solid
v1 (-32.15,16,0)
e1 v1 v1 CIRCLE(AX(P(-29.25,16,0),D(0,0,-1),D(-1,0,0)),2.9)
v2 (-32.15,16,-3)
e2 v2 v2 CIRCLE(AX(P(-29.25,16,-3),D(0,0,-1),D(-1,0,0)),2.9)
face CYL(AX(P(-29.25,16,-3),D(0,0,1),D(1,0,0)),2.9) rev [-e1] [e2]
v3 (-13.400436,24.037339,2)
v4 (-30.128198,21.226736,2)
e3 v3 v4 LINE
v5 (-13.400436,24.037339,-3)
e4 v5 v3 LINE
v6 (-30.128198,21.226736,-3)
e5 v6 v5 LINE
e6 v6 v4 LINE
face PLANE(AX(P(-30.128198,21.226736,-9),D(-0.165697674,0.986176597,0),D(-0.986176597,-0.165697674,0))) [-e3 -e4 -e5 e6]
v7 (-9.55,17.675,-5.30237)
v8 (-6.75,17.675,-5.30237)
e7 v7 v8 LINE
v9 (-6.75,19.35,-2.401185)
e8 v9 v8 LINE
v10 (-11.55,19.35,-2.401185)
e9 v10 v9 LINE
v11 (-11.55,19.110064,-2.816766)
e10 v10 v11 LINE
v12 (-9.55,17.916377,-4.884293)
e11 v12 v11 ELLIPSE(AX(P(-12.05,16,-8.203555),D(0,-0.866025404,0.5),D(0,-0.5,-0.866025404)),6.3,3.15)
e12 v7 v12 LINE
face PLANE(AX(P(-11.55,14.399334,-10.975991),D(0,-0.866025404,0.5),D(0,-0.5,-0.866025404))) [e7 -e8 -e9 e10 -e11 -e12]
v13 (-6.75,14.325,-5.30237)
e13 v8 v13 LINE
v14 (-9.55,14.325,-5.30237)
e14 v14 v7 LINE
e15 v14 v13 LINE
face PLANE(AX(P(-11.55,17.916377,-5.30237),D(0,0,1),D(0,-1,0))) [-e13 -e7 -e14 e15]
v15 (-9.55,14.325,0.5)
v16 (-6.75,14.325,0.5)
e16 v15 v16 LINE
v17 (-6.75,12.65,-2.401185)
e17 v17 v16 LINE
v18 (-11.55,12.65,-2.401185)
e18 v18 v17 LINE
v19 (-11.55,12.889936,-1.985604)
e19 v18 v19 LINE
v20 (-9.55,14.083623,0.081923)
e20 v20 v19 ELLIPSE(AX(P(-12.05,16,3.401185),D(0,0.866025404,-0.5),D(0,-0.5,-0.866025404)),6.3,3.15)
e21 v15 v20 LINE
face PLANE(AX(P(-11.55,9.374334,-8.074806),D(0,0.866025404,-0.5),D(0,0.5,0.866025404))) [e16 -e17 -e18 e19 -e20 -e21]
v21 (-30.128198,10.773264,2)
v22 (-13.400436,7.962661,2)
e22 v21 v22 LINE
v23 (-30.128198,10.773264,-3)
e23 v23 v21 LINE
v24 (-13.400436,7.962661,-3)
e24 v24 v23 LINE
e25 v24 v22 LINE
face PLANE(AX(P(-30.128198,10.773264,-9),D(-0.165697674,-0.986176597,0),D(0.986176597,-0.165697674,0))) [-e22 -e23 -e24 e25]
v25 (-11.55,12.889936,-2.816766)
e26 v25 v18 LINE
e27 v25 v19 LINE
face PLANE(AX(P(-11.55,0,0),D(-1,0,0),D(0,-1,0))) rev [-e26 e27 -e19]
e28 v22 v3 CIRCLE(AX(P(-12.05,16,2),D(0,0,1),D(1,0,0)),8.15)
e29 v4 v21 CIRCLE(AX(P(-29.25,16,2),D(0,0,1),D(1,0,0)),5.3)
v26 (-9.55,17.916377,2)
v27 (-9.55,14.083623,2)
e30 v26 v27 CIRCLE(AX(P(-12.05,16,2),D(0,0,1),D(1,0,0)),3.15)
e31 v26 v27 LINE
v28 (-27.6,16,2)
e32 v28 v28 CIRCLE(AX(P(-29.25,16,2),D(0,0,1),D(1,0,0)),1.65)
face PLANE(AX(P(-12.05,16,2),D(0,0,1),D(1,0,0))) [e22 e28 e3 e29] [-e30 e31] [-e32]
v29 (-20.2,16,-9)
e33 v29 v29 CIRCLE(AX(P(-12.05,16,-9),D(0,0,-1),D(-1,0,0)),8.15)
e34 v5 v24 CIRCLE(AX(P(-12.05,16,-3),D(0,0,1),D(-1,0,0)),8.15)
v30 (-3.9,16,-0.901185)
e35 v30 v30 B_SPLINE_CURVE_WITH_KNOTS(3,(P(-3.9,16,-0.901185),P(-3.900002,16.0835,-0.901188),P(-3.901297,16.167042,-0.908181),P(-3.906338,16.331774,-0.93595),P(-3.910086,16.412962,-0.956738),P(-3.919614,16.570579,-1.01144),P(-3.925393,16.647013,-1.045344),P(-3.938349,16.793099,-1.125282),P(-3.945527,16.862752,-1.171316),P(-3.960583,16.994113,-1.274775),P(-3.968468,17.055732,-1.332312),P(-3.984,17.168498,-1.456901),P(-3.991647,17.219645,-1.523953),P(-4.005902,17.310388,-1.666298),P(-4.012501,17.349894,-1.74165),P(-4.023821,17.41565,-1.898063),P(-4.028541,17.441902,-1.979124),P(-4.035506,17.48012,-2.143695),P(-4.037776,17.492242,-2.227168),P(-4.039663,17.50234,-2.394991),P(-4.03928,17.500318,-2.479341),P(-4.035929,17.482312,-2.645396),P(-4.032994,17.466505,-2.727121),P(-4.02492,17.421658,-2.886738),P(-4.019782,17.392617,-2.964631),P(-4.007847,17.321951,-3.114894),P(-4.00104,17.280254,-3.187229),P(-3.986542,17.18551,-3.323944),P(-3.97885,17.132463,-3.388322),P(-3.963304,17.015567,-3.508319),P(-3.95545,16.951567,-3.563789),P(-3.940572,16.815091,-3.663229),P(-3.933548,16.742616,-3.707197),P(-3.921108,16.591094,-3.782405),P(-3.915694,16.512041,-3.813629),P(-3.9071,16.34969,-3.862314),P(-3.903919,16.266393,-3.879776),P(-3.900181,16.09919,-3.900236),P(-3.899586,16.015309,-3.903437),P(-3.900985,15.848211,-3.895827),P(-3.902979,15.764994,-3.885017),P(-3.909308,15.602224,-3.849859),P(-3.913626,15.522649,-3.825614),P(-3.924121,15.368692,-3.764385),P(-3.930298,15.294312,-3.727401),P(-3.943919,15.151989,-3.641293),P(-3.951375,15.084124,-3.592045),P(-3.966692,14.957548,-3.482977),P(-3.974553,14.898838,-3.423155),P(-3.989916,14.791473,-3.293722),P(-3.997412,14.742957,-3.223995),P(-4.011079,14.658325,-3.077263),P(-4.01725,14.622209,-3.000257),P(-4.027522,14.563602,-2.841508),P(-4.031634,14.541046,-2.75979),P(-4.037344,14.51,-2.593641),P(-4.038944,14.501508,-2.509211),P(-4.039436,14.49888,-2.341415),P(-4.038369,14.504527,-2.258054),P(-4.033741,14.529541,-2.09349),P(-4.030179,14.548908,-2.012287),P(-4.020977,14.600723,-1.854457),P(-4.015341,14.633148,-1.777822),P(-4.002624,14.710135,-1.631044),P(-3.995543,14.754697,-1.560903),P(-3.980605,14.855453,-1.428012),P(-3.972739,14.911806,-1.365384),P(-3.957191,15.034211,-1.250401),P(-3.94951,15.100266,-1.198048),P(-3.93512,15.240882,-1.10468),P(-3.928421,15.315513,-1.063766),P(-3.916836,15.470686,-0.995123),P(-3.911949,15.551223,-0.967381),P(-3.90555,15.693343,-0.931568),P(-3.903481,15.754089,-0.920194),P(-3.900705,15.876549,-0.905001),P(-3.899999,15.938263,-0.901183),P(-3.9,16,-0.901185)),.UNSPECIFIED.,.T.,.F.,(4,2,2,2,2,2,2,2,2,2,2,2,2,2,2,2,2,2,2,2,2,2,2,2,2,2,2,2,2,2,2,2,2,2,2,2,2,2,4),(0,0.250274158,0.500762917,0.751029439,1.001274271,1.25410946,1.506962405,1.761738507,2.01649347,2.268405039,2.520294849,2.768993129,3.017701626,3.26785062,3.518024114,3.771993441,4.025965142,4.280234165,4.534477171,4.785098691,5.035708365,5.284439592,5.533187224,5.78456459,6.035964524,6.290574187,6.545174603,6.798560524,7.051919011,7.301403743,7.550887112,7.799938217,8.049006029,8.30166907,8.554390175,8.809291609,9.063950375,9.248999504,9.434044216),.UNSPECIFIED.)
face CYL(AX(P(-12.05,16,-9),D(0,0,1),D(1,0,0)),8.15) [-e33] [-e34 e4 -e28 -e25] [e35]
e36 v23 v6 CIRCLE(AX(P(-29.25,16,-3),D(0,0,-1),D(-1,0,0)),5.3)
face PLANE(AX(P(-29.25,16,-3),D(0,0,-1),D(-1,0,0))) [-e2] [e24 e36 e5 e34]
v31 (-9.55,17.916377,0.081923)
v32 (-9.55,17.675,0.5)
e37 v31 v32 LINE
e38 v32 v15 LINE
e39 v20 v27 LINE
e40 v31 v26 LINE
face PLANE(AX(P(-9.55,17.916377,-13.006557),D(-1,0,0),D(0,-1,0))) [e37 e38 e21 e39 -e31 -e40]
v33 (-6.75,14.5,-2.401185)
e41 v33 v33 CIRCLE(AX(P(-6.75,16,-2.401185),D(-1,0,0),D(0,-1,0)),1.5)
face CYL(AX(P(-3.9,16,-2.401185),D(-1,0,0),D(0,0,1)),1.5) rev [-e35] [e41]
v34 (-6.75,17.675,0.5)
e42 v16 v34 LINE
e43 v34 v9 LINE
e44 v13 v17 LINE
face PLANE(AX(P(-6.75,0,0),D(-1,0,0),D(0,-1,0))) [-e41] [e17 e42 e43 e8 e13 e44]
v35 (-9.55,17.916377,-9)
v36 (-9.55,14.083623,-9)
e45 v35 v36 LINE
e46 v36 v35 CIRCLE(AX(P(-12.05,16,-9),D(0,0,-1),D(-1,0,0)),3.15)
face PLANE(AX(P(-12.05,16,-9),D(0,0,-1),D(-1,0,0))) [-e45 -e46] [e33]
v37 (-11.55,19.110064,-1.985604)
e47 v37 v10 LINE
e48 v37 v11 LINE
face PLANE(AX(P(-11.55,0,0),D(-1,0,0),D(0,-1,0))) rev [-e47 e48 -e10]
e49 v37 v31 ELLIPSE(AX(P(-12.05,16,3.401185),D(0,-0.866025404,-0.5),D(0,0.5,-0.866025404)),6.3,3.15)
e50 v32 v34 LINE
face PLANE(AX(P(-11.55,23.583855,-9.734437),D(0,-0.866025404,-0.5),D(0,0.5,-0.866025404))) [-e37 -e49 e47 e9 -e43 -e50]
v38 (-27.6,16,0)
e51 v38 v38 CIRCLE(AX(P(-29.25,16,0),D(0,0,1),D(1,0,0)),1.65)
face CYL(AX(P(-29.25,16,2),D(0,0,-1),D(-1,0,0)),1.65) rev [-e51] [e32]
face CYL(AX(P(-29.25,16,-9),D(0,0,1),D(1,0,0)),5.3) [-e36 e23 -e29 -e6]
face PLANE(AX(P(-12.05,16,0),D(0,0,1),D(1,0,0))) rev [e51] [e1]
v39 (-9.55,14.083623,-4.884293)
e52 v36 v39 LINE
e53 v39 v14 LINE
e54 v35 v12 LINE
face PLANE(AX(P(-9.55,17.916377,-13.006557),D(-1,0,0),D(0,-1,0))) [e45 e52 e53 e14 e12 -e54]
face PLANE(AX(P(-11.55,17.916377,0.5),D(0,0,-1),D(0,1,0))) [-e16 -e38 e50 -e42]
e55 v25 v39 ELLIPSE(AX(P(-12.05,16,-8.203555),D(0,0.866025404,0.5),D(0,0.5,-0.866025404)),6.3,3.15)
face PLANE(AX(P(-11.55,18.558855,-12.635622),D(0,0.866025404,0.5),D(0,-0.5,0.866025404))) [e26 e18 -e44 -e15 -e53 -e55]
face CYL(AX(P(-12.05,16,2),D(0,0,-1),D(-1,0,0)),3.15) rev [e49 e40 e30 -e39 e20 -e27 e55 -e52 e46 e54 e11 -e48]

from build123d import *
from build123d.topology import SkipClean

# Parameters (mm, degrees)
SKETCH1_R               = 22.5
SKETCH1_R_2             = 3.15
SKETCH1_R_3             = 1.65
BOSS_EXTRUDE1_DEPTH     = 2
BOSS_EXTRUDE2_START     = 9
SKETCH2_R               = 8.15
SKETCH2_R_2             = 3.15
BOSS_EXTRUDE2_DEPTH     = 9
CUT_EXTRUDE1_DEPTH      = 53.886222213
CUT_EXTRUDE1_DEPTH_BACK = 53.886222213
SKETCH3_W               = 59.321790447
SKETCH3_H               = 68.701430229
BOSS_EXTRUDE4_START     = -11
BOSS_EXTRUDE4_DEPTH     = 11
CUT_EXTRUDE2_DEPTH      = 2.8
CUT_EXTRUDE2_DEPTH_BACK = 2
CUT_EXTRUDE2_START      = -9.55
SKETCH5_R               = 1.5
CUT_EXTRUDE3_DEPTH      = 35.543052847
BOSS_EXTRUDE3_START     = 3
SKETCH6_R               = 2.9
BOSS_EXTRUDE3_DEPTH     = 3


# Read off the part's stored shape, not the designer's step: Boss-Extrude4
with BuildPart() as part:
    # Sketch1 → Boss-Extrude1 (new body)
    with BuildSketch(Plane.XY):
        with Locations((-12.05, 16)):
            Circle(SKETCH1_R)
        with Locations((-12.05, 16)):
            Circle(SKETCH1_R_2, mode=Mode.SUBTRACT)
        with Locations((-29.25, 16)):
            Circle(SKETCH1_R_3, mode=Mode.SUBTRACT)
        with Locations((5.15, 16)):
            Circle(SKETCH1_R_3, mode=Mode.SUBTRACT)
    extrude(amount=BOSS_EXTRUDE1_DEPTH)

    # Sketch2 → Boss-Extrude2 (add)
    with SkipClean():  # the faces are left unmerged after this step: merging them gives an invalid solid
        with BuildSketch(Plane(origin=(0, 0, 0), x_dir=(-1, 0, 0), z_dir=(0, 0, -1)).offset(BOSS_EXTRUDE2_START)):
            with Locations(Location((12.05, 16, 0), (0, 0, 180))):
                Circle(SKETCH2_R)
            with Locations((12.05, 16)):
                Circle(SKETCH2_R_2, mode=Mode.SUBTRACT)
        extrude(amount=-BOSS_EXTRUDE2_DEPTH)

    # Sketch3 → Cut-Extrude1 (cut, two sides: drawn at the far end of the back side and taken through both)
    with BuildSketch(Plane.XY.offset(2).offset(-CUT_EXTRUDE1_DEPTH_BACK)):
        with Locations((-10.056838751, 16.22852839)):
            Rectangle(SKETCH3_W, SKETCH3_H)
        with BuildLine():
            Line((-30.128197674, 10.773264035), (-13.400436047, 7.962660734))
            ThreePointArc((-13.400436047, 7.962660734), (-3.9, 16), (-13.400436047, 24.037339266))
            Line((-13.400436047, 24.037339266), (-30.128197674, 21.226735965))
            ThreePointArc((-30.128197674, 21.226735965), (-34.55, 16), (-30.128197674, 10.773264035))
        make_face(mode=Mode.SUBTRACT)
    extrude(amount=CUT_EXTRUDE1_DEPTH + CUT_EXTRUDE1_DEPTH_BACK, mode=Mode.SUBTRACT)

    # Boss-Extrude4 outline → Boss-Extrude4 (add)
    with BuildSketch(Plane.XY.offset(2).offset(BOSS_EXTRUDE4_START)):
        with BuildLine():
            ThreePointArc((-9.55, 14.08362321), (-8.9, 16), (-9.55, 17.91637679))
            Line((-9.55, 17.91637679), (-9.55, 14.08362321))
        make_face()
    extrude(amount=BOSS_EXTRUDE4_DEPTH)

    # Sketch4 → Cut-Extrude2 (cut, two sides: drawn at the far end of the back side and taken through both)
    with BuildSketch(Plane(origin=(0, 0, 0), x_dir=(0, 0, -1), z_dir=(1, 0, 0)).offset(CUT_EXTRUDE2_START - CUT_EXTRUDE2_DEPTH_BACK)):
        Polygon((-0.5, 17.675), (-0.5, 14.325), (2.401185103, 12.65), (5.302370205, 14.325), (5.302370205, 17.675), (2.401185103, 19.35), align=None)
    extrude(amount=CUT_EXTRUDE2_DEPTH + CUT_EXTRUDE2_DEPTH_BACK, mode=Mode.SUBTRACT)

    # Sketch5 → Cut-Extrude3 (cut, through all)
    with BuildSketch(Plane.ZY.offset(11.55)):
        with Locations((-2.401185103, 16)):
            Circle(SKETCH5_R)
    extrude(amount=-CUT_EXTRUDE3_DEPTH, mode=Mode.SUBTRACT)

    # Sketch6 → Boss-Extrude3 (add)
    with BuildSketch(Plane(origin=(0, 0, 0), x_dir=(-1, 0, 0), z_dir=(0, 0, -1)).offset(BOSS_EXTRUDE3_START)):
        with BuildLine():
            Line((30.128197674, 21.226735965), (13.400436047, 24.037339266))
            ThreePointArc((13.400436047, 24.037339266), (20.2, 16), (13.400436047, 7.962660734))
            Line((13.400436047, 7.962660734), (30.128197674, 10.773264035))
            ThreePointArc((30.128197674, 10.773264035), (34.55, 16), (30.128197674, 21.226735965))
        make_face()
        with Locations((29.25, 16)):
            Circle(SKETCH6_R, mode=Mode.SUBTRACT)
    extrude(amount=-BOSS_EXTRUDE3_DEPTH)


solid = part.part
